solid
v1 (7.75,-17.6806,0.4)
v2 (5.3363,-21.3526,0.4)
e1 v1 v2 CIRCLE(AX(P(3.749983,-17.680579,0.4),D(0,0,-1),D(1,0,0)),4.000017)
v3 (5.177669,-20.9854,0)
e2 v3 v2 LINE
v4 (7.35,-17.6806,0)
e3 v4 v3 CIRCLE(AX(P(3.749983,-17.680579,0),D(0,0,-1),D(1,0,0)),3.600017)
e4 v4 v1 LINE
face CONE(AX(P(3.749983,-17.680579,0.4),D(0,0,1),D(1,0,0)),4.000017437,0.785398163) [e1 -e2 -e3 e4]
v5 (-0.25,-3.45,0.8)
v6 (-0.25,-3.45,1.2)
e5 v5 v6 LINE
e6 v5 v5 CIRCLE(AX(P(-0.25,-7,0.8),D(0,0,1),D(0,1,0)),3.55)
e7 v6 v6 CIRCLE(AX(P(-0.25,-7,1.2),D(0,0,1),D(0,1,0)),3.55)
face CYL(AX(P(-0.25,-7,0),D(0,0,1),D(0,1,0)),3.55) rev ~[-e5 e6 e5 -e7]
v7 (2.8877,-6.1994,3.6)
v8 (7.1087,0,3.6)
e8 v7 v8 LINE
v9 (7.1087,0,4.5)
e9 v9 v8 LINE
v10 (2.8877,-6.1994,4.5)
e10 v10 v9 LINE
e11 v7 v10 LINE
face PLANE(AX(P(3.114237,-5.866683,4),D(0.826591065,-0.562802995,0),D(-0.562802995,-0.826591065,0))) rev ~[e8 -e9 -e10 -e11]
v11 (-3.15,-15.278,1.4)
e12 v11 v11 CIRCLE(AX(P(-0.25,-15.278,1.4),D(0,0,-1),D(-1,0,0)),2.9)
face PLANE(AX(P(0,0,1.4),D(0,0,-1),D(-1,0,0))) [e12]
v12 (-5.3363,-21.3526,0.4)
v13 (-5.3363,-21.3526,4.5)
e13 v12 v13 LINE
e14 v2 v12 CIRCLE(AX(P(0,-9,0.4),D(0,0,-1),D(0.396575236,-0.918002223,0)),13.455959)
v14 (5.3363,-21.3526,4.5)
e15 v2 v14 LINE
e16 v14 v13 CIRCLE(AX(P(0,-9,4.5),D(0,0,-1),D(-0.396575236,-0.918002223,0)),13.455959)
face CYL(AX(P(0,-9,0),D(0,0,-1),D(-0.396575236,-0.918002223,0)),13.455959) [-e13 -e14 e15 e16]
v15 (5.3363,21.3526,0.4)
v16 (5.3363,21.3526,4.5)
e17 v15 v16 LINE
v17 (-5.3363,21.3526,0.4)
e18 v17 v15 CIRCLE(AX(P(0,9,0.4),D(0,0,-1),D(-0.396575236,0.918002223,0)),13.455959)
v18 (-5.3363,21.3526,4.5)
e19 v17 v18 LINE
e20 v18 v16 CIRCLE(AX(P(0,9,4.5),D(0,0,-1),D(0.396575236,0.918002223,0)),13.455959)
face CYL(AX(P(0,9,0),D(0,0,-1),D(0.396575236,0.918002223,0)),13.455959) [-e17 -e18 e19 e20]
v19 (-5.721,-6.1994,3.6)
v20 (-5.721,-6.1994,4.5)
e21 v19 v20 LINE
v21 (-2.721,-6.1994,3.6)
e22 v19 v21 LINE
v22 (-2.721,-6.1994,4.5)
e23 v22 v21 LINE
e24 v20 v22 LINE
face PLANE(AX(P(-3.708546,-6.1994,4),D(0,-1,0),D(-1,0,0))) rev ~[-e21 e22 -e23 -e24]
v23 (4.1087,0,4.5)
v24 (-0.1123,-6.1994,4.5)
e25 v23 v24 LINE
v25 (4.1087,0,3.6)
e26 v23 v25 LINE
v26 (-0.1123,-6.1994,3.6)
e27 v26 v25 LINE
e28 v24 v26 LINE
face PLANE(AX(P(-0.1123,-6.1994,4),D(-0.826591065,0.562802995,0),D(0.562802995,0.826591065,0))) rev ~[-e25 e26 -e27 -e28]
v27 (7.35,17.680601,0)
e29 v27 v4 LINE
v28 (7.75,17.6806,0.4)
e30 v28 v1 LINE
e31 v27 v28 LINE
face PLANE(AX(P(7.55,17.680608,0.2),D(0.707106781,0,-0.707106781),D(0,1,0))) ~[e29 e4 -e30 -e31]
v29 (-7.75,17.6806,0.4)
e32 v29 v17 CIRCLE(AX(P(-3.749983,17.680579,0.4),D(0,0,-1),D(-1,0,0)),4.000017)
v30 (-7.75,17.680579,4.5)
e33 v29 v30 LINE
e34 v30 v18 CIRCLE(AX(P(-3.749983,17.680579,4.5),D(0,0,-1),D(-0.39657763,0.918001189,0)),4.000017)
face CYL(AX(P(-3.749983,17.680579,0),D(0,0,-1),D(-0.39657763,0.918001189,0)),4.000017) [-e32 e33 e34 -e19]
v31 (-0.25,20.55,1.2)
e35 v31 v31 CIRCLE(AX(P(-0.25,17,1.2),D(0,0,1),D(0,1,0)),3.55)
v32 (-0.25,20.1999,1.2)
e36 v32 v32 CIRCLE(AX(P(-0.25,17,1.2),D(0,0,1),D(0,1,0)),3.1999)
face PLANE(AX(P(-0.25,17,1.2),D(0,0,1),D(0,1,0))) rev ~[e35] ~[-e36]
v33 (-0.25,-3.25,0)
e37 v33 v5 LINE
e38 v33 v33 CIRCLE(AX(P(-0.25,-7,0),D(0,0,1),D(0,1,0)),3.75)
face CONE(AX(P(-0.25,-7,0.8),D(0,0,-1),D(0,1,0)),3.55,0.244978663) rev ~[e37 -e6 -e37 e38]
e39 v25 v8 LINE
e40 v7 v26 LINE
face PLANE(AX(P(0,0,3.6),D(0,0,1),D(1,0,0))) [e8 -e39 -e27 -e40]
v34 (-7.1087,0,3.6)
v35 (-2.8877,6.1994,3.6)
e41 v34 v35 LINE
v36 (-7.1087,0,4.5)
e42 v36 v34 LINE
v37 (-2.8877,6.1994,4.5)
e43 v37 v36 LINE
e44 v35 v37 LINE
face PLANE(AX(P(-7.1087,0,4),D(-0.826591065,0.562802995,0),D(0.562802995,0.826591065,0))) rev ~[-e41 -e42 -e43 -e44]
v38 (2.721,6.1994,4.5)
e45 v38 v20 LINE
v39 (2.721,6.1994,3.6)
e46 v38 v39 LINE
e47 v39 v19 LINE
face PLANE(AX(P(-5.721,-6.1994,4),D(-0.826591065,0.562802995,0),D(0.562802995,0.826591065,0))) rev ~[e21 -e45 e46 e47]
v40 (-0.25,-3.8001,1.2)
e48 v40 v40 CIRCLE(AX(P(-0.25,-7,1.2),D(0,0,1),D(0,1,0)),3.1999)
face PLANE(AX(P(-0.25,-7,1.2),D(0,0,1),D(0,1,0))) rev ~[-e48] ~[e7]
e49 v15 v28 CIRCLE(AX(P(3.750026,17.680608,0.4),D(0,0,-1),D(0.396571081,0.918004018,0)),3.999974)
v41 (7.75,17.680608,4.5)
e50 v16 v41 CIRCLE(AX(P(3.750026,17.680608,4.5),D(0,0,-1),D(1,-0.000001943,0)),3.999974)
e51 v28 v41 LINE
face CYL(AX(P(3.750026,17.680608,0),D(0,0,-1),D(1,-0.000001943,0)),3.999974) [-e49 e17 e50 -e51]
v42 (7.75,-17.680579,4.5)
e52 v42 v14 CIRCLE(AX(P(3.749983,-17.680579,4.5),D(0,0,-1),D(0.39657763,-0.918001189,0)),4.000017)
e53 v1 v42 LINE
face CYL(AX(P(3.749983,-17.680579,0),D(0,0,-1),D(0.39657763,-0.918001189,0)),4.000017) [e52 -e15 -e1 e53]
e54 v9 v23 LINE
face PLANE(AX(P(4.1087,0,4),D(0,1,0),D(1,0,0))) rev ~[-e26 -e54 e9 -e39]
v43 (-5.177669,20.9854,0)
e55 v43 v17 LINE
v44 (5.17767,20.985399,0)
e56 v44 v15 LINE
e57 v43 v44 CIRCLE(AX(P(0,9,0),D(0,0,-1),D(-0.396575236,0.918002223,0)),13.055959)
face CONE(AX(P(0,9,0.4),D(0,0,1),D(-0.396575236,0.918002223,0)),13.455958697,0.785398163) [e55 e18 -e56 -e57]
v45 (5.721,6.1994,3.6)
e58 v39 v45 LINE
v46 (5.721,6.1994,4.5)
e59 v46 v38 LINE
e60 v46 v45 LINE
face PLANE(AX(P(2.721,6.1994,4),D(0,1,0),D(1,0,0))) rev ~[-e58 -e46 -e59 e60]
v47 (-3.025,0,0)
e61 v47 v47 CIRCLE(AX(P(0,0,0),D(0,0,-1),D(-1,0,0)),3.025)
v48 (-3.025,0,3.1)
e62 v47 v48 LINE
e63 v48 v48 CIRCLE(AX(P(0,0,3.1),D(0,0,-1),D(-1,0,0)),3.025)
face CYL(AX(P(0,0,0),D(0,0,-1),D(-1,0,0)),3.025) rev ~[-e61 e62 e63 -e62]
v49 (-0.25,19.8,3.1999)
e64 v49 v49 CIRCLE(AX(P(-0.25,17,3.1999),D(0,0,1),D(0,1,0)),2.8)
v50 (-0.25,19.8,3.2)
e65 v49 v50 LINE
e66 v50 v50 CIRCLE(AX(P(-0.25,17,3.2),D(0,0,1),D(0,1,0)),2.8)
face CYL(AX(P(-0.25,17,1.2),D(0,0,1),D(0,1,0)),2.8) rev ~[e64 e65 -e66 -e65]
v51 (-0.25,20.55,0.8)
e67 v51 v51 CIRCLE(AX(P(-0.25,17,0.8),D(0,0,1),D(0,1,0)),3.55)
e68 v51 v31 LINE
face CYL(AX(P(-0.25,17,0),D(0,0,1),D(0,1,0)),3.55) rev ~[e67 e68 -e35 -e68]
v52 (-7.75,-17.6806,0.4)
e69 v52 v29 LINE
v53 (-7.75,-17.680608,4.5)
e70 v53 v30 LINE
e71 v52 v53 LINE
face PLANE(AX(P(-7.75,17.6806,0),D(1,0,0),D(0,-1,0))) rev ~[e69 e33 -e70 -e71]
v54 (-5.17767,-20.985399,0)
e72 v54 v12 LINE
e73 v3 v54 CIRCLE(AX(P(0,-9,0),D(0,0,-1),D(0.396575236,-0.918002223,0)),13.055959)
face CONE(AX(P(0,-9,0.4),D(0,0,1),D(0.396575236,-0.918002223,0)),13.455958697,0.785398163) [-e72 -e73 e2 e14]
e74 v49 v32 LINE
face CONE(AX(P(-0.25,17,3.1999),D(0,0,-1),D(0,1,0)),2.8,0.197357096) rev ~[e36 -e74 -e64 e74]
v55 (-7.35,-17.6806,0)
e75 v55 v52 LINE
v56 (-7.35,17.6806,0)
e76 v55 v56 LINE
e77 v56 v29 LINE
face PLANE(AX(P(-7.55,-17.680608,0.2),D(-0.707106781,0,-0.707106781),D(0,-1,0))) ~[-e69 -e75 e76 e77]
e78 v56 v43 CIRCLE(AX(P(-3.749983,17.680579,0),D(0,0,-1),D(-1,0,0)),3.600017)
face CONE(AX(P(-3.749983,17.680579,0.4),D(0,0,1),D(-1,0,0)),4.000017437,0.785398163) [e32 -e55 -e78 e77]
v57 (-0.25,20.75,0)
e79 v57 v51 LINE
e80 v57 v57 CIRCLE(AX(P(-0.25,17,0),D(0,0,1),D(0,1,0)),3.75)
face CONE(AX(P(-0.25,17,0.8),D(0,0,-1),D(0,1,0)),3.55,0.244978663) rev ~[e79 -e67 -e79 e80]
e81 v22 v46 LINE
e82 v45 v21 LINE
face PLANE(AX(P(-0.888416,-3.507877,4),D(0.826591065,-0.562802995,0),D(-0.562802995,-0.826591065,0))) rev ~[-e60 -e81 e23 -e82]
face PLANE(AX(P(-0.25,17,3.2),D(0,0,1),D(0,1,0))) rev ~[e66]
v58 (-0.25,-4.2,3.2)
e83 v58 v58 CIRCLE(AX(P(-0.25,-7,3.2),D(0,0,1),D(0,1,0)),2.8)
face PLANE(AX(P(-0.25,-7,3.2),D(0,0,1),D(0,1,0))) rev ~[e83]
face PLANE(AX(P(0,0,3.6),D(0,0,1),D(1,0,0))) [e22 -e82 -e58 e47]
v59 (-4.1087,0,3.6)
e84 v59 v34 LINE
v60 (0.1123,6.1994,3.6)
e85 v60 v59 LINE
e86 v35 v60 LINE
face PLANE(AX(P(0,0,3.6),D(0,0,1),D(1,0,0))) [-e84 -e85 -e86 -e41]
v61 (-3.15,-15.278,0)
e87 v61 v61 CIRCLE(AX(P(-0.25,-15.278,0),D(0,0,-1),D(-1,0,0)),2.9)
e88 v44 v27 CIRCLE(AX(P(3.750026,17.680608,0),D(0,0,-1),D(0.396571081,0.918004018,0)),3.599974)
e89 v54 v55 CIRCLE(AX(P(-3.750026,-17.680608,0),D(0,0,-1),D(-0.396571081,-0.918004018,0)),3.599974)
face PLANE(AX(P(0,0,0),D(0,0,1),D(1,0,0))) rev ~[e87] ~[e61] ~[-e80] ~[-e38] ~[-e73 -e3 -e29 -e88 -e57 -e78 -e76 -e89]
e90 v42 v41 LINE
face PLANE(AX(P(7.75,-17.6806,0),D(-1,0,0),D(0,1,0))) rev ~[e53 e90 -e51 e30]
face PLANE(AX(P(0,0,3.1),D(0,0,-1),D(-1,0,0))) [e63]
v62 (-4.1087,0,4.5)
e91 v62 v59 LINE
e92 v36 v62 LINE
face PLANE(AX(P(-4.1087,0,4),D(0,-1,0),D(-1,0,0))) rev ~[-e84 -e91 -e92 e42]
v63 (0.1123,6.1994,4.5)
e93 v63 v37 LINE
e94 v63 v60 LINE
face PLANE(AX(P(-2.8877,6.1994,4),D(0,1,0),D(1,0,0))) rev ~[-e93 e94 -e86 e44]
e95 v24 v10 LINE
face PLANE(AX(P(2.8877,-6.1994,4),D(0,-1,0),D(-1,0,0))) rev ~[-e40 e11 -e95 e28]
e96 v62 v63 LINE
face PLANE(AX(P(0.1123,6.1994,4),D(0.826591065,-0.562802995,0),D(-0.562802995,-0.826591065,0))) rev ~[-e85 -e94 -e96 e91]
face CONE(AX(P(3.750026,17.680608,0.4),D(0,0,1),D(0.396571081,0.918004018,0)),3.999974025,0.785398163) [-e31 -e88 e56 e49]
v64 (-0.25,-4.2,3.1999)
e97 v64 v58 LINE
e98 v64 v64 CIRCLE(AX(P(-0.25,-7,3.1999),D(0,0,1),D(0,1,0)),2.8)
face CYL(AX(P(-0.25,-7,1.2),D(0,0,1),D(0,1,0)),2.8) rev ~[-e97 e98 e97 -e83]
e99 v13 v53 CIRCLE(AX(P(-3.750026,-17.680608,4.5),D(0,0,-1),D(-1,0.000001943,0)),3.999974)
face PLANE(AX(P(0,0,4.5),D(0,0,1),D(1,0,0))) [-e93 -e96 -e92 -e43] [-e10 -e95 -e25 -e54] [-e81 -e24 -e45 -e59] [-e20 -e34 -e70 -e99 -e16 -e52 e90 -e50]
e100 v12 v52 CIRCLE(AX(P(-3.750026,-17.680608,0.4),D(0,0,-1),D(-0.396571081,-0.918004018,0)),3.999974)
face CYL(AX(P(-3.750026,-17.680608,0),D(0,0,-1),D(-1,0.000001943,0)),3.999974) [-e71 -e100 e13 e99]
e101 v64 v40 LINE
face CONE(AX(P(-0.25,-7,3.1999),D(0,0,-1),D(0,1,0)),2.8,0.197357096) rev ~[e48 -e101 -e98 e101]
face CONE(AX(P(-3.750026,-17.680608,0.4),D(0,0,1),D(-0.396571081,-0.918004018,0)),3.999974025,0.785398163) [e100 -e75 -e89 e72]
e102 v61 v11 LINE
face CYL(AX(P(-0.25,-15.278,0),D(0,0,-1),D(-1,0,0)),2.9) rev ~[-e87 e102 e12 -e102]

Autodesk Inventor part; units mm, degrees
ref_plane "YZ Plane" through (0, 0, 0) normal (1, 0, 0) x (0, 1, 0)
ref_plane "XZ Plane" through (0, 0, 0) normal (0, 1, 0) x (-1, 0, 0)
ref_plane "XY Plane" through (0, 0, 0) normal (0, 0, 1) x (1, 0, 0)
sketch "Skizze1" plane through (0, 0, 0) normal (0, 0, 1) x (1, 0, 0)
  line L0 (7.75, -17.6806) -> (7.75, 17.6806) projected
  line L1 (-7.75, 17.6806) -> (-7.75, -17.6806) projected
  circle A0 centre (0, 0) radius 3.025 projected
  arc A1 (-5.3363, -21.3526) -> (5.3363, -21.3526) centre (0, -9) ccw projected
  arc A2 (5.3363, -21.3526) -> (7.75, -17.6806) centre (3.75, -17.6806) ccw projected
  arc A3 (7.75, 17.6806) -> (5.3363, 21.3526) centre (3.75, 17.6806) ccw projected
  arc A4 (5.3363, 21.3526) -> (-5.3363, 21.3526) centre (0, 9) ccw projected
  arc A5 (-5.3363, 21.3526) -> (-7.75, 17.6806) centre (-3.75, 17.6806) ccw projected
  arc A6 (-7.75, -17.6806) -> (-5.3363, -21.3526) centre (-3.75, -17.6806) ccw projected
  circle A7 centre (-0.25, 17) radius 1.7 projected
  circle A8 centre (-0.25, -7) radius 1.7 projected
  line L2 (5.34, 14.1) -> (3.3, 14.1) projected
  line L3 (3.3, 14.1) -> (3.3, 17.74) projected
  line L4 (3.3, 17.74) -> (5.34, 17.74) projected
  line L5 (5.34, 17.74) -> (5.34, 14.1) projected
  line L6 (-3.8, 14.1) -> (-5.84, 14.1) projected
  line L7 (-5.84, 14.1) -> (-5.84, 17.74) projected
  line L8 (-5.84, 17.74) -> (-3.8, 17.74) projected
  line L9 (-3.8, 17.74) -> (-3.8, 14.1) projected
  circle A9 centre (-0.25, -15.278) radius 2.9 projected
  point P0 (0, 0)
  point P1 (-17.1225, -5.975)
  point P2 (-17.1225, -12.025)
  point P3 (-17.1225, 6.3)
  point P4 (-17.1225, -14.3)
  point P5 (-17.1225, -17.7)
extrude "Extrusion1" add sketch "Skizze1" along normal blind 4 contours A2 A1 A6 L1 A5 A4 A3 L0 | A0 | A7 | A8 | L2 L3 L4 L5 | L6 L7 L8 L9 | A9
sketch "Skizze2" plane through (0, 0, 0) normal (0, 0, -1) x (-1, 0, 0)
  circle A0 centre (0, 0) radius 3.025 projected
  arc A1 (-5.3363, -21.3526) -> (5.3363, -21.3526) centre (0, -9) ccw projected
  arc A2 (-7.75, -17.6806) -> (-5.3363, -21.3526) centre (-3.75, -17.6806) ccw projected
  line L0 (-7.75, -17.6806) -> (-7.75, 17.6806) projected
  arc A3 (-5.3363, 21.3526) -> (-7.75, 17.6806) centre (-3.75, 17.6806) ccw projected
  arc A4 (5.3363, 21.3526) -> (-5.3363, 21.3526) centre (0, 9) ccw projected
  arc A5 (7.75, 17.6806) -> (5.3363, 21.3526) centre (3.75, 17.6806) ccw projected
  line L1 (7.75, 17.6806) -> (7.75, -17.6806) projected
  arc A6 (5.3363, -21.3526) -> (7.75, -17.6806) centre (3.75, -17.6806) ccw projected
  circle A7 centre (0.25, 17) radius 1.7 projected
  circle A8 centre (0.25, -7) radius 1.7 projected
  line L2 (-5.34, 14.1) -> (-3.3, 14.1) projected
  line L3 (-3.3, 14.1) -> (-3.3, 17.74) projected
  line L4 (-3.3, 17.74) -> (-5.34, 17.74) projected
  line L5 (-5.34, 17.74) -> (-5.34, 14.1) projected
  line L6 (3.8, 14.1) -> (5.84, 14.1) projected
  line L7 (5.84, 14.1) -> (5.84, 17.74) projected
  line L8 (5.84, 17.74) -> (3.8, 17.74) projected
  line L9 (3.8, 17.74) -> (3.8, 14.1) projected
  circle A9 centre (0.25, -15.278) radius 2.9 projected
  point P0 (0, 0)
extrude "Extrusion2" cut sketch "Skizze2" against normal blind 3.1 contours A0
sketch "Skizze3" plane through (0, 0, 0) normal (0, 0, -1) x (-1, 0, 0)
  circle A0 centre (0, 0) radius 3.025 projected
  arc A1 (-5.3363, -21.3526) -> (5.3363, -21.3526) centre (0, -9) ccw projected
  arc A2 (-7.75, -17.6806) -> (-5.3363, -21.3526) centre (-3.75, -17.6806) ccw projected
  line L0 (-7.75, -17.6806) -> (-7.75, 17.6806) projected
  arc A3 (-5.3363, 21.3526) -> (-7.75, 17.6806) centre (-3.75, 17.6806) ccw projected
  arc A4 (5.3363, 21.3526) -> (-5.3363, 21.3526) centre (0, 9) ccw projected
  arc A5 (7.75, 17.6806) -> (5.3363, 21.3526) centre (3.75, 17.6806) ccw projected
  line L1 (7.75, 17.6806) -> (7.75, -17.6806) projected
  arc A6 (5.3363, -21.3526) -> (7.75, -17.6806) centre (3.75, -17.6806) ccw projected
  circle A7 centre (0.25, 17) radius 1.7 projected
  circle A8 centre (0.25, -7) radius 1.7 projected
  line L2 (-5.34, 14.1) -> (-3.3, 14.1) projected
  line L3 (-3.3, 14.1) -> (-3.3, 17.74) projected
  line L4 (-3.3, 17.74) -> (-5.34, 17.74) projected
  line L5 (-5.34, 17.74) -> (-5.34, 14.1) projected
  line L6 (3.8, 14.1) -> (5.84, 14.1) projected
  line L7 (5.84, 14.1) -> (5.84, 17.74) projected
  line L8 (5.84, 17.74) -> (3.8, 17.74) projected
  line L9 (3.8, 17.74) -> (3.8, 14.1) projected
  circle A9 centre (0.25, -15.278) radius 2.9 projected
  point P0 (0, 0)
hole "Bohrung1" at (-0.25, 17, 0) at (-0.25, -7, 0) direction (0, 0, 1) diameter 5.6 depth 3.2 counterbore diameter 7.1 counterbore depth 1.2
sketch "Skizze4" plane through (0, 0, 4) normal (0, 0, 1) x (1, 0, 0)
  circle A0 centre (-0.25, 17) radius 3.55 projected
  circle A1 centre (-0.25, -7) radius 3.55 projected
  circle A2 centre (0, 0) radius 3.025 projected
  arc A3 (5.3363, -21.3526) -> (7.75, -17.6806) centre (3.75, -17.6806) ccw projected
  arc A4 (-5.3363, -21.3526) -> (5.3363, -21.3526) centre (0, -9) ccw projected
  arc A5 (-7.75, -17.6806) -> (-5.3363, -21.3526) centre (-3.75, -17.6806) ccw projected
  line L0 (-7.75, 17.6806) -> (-7.75, -17.6806) projected
  arc A6 (-5.3363, 21.3526) -> (-7.75, 17.6806) centre (-3.75, 17.6806) ccw projected
  arc A7 (5.3363, 21.3526) -> (-5.3363, 21.3526) centre (0, 9) ccw projected
  arc A8 (7.75, 17.6806) -> (5.3363, 21.3526) centre (3.75, 17.6806) ccw projected
  line L1 (7.75, -17.6806) -> (7.75, 17.6806) projected
  circle A9 centre (12.6079, -10) radius 2.8
  circle A10 centre (12.6079, -10) radius 2.8
  line L2 (4.1087, 0) -> (7.1087, 0)
  line L3 (7.1087, 0) -> (2.8877, -6.1994)
  line L4 (2.8877, -6.1994) -> (-0.1123, -6.1994)
  line L5 (-0.1123, -6.1994) -> (4.1087, 0)
  line L6 (2.721, 6.1994) -> (5.721, 6.1994)
  line L7 (5.721, 6.1994) -> (-2.721, -6.1994)
  line L8 (-2.721, -6.1994) -> (-5.721, -6.1994)
  line L9 (-5.721, -6.1994) -> (2.721, 6.1994)
  line L10 (-2.8877, 6.1994) -> (0.1123, 6.1994)
  line L11 (0.1123, 6.1994) -> (-4.1087, 0)
  line L12 (-4.1087, 0) -> (-7.1087, 0)
  line L13 (-7.1087, 0) -> (-2.8877, 6.1994)
  line L14 (7.1087, 6.1994) -> (7.1087, -6.1994)
  line L15 (7.1087, -6.1994) -> (-7.1087, -6.1994)
  line L16 (-7.1087, -6.1994) -> (-7.1087, 6.1994)
  line L17 (-7.1087, 6.1994) -> (7.1087, 6.1994)
  point P0 (0, 0)
  point P1 (16.5579, -10)
  point P2 (16.5579, -10)
  point P3 (16.5579, -10)
  point P4 (50.5428, -9.282)
  point P5 (-4.221, -6.1994)
  point P6 (4.221, 6.1994)
  point P7 (-1.3877, 6.1994)
  point P8 (1.3877, -6.1994)
  dimension "d89" = 5.6
  dimension "d104" = 5.6
  dimension "d107" = 14.2174
  dimension "d108" = 12.3988
  dimension "d109" = 2.1563
  dimension "d110" = 2.1563
  dimension "d111" = 2.4798
  dimension "d112" = 2.4798
  dimension "d113" = 2.4798
  dimension "d114" = 6.1994
  dimension "d115" = 6.1994
  dimension "d116" = 6.1994
  dimension "d117" = 15.5
  dimension "d118" = 0.6413
move faces "Verschieben1" translate (0, 0, 0.5) faces at (-2.5833, -5.8935, 4)
extrude "Extrusion4" cut sketch "Skizze4" along normal mid plane 0.8 contours L8 L9 A2 L7 A1 | A1 L7 L8 | L3 L4 L5 A1 | A1 L5 L2 L3 | A2 L9 L7 | A2 L9 L6 L7 | L13 L10 L11 L12
extrude "Extrusion5" cut sketch "Skizze4" along normal through all contours L8 L9 A2 L7 A1 | A1 L7 L8 | L3 L4 L5 A1 | A1 L5 L2 L3 | A2 L9 L7 | A2 L9 L6 L7 | L13 L10 L11 L12
sketch "Skizze5" plane through (0, 0, 0) normal (0, 0, -1) x (-1, 0, 0)
  circle A0 centre (0.25, -15.278) radius 2.9 projected
  point P0 (0, 0)
extrude "Extrusion6" cut sketch "Skizze5" against normal blind 1.4
chamfer "Fase2" distance 0.2 distance2 0.8 1 edges at (-0.25, -10.55, 0) measured on face at (6.175, 0, 0)
chamfer "Fase3" distance 2 distance2 0.4 1 edges at (-0.25, -9.8, 1.2) measured on face at (0.1992, -4.2363, 2.5333)
chamfer "Fase4" distance 2 distance2 0.4 1 edges at (-0.25, 14.2, 1.2) measured on face at (0.1992, 19.7637, 2.5333)
chamfer "Fase5" distance 0.2 distance2 0.8 1 edges at (-0.25, 13.45, 0) measured on face at (6.175, 0, 0)
chamfer "Fase6" distance 0.4 angle 45 8 edges at (-7.75, 0, 0) (-7.0925, -19.8777, 0) (0, -22.4559, 0) (7.0925, -19.8777, 0) (7.75, 0, 0) (7.0925, 19.8777, 0) (0, 22.4559, 0) (-7.0925, 19.8777, 0)
properties part number "Cover_Squared"
